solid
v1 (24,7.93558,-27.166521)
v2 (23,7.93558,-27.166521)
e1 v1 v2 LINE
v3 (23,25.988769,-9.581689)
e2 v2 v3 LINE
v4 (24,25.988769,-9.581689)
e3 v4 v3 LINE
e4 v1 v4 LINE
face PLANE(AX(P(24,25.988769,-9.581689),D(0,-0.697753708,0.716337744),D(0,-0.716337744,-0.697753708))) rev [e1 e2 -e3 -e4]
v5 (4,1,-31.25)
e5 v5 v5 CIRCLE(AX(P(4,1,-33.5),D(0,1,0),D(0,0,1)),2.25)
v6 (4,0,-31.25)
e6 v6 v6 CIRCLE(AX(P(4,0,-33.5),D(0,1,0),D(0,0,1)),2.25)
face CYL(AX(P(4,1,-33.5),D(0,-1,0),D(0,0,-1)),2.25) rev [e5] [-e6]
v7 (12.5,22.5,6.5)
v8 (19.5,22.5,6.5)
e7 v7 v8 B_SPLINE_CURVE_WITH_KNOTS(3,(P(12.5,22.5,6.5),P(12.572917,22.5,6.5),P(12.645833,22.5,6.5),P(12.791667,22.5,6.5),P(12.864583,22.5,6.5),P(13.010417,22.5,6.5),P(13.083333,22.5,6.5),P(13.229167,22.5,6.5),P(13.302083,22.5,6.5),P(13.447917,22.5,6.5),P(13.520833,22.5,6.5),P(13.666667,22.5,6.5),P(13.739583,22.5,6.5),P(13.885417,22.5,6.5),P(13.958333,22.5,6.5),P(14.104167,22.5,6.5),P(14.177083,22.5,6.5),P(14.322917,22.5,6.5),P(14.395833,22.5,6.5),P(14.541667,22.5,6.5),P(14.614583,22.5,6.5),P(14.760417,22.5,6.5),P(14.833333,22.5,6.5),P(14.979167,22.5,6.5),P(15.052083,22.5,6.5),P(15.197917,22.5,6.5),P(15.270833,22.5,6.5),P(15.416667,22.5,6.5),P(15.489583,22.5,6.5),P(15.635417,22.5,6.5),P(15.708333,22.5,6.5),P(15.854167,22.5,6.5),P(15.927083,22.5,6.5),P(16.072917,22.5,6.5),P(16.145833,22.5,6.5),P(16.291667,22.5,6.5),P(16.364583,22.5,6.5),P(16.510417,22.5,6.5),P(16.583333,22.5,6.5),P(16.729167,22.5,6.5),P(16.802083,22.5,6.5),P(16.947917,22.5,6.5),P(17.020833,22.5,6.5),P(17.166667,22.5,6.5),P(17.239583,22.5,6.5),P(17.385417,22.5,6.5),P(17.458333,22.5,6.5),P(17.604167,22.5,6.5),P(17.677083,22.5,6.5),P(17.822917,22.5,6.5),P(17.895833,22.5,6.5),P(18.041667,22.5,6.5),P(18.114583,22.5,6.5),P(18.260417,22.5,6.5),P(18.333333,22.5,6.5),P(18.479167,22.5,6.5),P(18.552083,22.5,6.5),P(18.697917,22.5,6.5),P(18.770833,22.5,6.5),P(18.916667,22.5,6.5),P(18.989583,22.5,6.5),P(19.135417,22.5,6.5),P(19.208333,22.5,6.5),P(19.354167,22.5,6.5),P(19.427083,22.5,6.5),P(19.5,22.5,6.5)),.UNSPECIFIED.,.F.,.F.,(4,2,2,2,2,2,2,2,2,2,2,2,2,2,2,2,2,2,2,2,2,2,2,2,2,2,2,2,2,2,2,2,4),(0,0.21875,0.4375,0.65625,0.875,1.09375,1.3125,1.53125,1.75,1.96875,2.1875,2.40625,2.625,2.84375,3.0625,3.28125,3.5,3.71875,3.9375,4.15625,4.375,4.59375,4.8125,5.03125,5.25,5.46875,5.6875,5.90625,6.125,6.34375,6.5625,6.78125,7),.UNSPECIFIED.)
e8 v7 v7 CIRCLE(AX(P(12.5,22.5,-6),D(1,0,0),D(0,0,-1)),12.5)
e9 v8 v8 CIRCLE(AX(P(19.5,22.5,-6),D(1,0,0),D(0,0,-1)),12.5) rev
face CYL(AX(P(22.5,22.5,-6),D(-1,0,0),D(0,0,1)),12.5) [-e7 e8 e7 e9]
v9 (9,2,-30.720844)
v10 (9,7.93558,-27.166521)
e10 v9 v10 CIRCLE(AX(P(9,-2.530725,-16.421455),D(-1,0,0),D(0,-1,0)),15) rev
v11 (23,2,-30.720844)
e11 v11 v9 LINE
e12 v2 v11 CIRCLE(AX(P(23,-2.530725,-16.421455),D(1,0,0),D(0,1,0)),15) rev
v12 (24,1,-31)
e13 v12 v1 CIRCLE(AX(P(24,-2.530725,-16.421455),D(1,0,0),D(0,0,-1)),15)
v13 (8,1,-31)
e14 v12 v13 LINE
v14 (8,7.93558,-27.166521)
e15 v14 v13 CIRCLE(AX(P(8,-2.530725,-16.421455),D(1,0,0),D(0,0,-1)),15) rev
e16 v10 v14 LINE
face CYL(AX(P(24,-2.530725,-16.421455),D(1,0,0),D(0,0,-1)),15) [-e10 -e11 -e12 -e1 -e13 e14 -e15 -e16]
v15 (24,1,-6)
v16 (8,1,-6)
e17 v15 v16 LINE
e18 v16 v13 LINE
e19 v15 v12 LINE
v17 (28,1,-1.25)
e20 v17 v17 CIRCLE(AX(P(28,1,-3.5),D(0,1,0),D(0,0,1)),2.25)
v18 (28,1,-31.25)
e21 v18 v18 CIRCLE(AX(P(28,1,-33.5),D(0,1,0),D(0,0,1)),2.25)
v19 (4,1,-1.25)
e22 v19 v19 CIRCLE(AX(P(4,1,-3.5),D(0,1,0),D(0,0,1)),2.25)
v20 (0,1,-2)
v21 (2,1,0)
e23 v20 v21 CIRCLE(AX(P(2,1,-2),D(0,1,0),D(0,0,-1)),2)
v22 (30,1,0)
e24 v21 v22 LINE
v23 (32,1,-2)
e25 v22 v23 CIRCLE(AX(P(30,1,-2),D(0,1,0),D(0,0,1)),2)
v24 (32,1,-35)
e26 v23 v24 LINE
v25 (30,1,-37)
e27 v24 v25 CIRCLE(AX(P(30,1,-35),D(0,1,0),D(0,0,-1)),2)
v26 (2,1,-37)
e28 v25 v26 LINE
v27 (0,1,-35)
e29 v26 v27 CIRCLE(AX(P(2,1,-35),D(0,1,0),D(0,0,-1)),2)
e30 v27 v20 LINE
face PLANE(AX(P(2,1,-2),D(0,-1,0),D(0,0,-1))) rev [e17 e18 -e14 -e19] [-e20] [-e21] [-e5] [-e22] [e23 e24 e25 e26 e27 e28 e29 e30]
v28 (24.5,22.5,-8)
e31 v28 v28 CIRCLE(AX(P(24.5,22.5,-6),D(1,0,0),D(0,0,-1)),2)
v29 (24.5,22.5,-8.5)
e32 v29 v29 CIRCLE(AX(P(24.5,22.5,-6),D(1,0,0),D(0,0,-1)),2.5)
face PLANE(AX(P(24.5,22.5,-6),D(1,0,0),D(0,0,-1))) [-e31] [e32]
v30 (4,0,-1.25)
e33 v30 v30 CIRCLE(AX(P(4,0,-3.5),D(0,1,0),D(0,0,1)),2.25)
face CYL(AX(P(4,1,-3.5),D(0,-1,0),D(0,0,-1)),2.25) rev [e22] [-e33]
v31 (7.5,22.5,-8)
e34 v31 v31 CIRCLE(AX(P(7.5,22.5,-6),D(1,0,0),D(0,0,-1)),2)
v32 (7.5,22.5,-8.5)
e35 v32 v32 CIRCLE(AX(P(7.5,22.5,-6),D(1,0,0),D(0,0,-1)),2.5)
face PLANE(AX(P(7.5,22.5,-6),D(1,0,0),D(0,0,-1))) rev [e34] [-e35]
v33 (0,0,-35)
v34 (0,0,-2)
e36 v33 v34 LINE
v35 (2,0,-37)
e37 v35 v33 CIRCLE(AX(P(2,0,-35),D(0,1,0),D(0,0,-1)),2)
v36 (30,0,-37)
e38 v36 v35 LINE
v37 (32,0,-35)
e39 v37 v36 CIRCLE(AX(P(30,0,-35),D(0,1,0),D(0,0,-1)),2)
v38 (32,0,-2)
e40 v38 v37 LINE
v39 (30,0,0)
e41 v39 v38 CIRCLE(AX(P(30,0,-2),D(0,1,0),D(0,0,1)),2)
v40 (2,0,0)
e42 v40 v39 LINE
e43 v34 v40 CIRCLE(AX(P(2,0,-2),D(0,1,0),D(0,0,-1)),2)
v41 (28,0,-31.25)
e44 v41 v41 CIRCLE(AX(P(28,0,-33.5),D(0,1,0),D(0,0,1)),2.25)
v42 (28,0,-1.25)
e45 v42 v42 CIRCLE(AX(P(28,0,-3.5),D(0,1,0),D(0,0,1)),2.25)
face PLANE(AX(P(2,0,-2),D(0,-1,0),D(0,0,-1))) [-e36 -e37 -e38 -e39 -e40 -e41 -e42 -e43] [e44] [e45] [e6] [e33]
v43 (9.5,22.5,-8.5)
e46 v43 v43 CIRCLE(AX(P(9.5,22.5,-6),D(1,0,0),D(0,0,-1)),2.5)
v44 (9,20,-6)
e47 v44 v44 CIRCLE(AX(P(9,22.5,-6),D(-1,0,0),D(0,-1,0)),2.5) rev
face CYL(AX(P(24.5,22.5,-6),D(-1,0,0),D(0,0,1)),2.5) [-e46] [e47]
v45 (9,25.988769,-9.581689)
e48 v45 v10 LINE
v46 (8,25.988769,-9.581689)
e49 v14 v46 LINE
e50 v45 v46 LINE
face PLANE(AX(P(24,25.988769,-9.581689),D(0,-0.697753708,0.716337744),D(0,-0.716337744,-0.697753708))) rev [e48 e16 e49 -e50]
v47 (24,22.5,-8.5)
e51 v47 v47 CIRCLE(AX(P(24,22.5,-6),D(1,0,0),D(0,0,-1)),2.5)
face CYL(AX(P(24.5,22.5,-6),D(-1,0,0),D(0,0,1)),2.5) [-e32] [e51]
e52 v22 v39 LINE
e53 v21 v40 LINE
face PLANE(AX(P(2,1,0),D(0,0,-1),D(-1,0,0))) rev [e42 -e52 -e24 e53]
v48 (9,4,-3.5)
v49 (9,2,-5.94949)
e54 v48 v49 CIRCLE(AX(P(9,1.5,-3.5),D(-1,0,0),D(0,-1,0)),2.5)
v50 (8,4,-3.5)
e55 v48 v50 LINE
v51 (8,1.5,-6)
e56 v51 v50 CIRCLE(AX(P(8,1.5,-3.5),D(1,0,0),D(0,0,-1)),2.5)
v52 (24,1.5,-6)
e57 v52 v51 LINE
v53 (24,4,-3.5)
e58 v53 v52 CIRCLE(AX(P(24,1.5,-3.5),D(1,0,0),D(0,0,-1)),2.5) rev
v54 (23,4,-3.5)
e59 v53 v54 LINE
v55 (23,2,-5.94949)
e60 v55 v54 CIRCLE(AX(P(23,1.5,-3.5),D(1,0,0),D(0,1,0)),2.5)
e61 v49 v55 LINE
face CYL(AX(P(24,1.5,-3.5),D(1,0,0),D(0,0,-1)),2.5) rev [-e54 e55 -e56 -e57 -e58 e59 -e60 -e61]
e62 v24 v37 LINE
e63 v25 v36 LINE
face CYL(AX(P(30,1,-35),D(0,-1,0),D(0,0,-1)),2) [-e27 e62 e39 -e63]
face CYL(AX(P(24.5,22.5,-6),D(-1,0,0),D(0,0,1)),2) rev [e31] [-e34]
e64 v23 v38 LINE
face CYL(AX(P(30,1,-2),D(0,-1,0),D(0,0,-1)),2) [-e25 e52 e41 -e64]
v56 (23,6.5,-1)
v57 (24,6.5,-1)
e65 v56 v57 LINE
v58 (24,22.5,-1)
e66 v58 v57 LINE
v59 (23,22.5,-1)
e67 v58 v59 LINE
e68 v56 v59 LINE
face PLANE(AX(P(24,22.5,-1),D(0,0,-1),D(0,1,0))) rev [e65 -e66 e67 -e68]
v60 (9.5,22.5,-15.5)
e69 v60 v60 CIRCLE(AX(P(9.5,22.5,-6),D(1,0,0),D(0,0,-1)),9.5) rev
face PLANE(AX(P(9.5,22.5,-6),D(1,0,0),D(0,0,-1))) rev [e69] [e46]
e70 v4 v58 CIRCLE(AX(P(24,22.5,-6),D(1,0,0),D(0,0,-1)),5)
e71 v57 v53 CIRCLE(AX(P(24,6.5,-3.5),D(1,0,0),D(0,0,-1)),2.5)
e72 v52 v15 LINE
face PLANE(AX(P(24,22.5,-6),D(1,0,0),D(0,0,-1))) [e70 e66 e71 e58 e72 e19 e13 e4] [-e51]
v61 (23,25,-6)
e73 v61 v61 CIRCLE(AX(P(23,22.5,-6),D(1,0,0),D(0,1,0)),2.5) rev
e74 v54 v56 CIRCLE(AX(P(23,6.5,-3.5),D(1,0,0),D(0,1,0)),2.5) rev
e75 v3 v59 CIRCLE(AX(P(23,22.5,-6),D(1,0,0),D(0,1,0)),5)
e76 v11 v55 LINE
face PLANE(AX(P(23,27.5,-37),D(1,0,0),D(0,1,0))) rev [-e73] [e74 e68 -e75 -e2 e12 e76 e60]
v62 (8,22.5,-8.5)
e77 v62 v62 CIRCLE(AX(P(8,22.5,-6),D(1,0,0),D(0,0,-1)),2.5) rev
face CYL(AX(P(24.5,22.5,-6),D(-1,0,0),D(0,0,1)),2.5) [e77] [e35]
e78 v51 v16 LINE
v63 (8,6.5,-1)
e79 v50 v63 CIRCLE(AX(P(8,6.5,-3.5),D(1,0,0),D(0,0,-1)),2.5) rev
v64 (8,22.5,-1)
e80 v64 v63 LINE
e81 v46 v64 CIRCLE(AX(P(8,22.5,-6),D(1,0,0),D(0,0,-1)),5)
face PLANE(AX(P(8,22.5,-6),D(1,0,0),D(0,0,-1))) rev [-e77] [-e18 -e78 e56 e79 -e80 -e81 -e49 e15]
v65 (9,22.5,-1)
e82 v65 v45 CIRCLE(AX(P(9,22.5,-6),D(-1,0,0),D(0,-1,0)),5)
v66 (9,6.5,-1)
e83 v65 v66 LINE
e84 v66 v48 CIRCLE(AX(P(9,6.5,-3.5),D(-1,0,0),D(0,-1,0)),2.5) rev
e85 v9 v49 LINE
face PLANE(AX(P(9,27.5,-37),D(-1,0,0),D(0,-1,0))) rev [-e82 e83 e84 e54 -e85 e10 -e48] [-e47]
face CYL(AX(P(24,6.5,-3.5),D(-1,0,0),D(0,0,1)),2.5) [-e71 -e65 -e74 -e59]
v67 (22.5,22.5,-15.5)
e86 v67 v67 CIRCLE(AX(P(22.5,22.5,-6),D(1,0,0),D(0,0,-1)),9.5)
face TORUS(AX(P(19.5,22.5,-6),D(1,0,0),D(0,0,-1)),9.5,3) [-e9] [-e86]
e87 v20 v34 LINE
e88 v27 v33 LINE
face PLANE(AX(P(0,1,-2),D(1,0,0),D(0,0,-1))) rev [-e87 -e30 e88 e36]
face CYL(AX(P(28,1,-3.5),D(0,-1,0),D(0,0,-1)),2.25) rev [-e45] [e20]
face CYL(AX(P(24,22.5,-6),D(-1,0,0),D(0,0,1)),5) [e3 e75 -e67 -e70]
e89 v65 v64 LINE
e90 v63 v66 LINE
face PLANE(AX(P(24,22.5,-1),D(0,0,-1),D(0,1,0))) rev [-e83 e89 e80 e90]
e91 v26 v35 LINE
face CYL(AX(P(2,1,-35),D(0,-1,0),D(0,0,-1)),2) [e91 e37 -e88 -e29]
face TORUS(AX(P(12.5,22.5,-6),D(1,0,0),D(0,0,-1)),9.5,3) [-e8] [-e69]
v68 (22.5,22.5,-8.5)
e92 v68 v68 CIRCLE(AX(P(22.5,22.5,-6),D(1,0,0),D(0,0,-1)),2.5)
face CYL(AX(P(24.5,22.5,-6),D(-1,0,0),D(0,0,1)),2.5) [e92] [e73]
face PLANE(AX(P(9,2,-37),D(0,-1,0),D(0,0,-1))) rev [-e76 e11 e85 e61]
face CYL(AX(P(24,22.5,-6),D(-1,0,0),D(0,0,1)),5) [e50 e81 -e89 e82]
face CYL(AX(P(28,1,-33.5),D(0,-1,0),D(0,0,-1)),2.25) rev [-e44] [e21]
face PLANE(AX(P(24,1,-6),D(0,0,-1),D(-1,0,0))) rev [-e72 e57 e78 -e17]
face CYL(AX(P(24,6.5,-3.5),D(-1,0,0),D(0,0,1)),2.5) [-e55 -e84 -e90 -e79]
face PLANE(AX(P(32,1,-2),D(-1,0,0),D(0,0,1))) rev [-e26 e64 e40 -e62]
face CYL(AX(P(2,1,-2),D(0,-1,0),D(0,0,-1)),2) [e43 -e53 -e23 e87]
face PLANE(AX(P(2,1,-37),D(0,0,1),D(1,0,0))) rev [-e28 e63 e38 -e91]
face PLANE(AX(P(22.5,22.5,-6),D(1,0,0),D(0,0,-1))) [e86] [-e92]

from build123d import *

# Parameters (mm, degrees)
ESBO_O1_R                = 2.25
RESSALTO_EXTRUS_O1_DEPTH = 1
ESBO_O2_R                = 2.5
RESSALTO_EXTRUS_O2_DEPTH = 8
ESBO_O3_W                = 14
ESBO_O3_H                = 25.5
CORTE_EXTRUS_O1_DEPTH    = 56.463952257
ESBO_O5_R                = 12.5
ESBO_O5_R_2              = 2.5
RESSALTO_EXTRUS_O3_DEPTH = 6.5
FILETE1_R                = 3
ESBO_O6_R                = 2.5
ESBO_O6_R_2              = 2
RESSALTO_EXTRUS_O4_DEPTH = 8.5
FILETE2_R                = 2.5
FILETE3_R                = 15


# Some blends are built 0.0001 mm under size
with BuildPart() as part:
    # Esboço1 → Ressalto-extrusão1 (new body)
    with BuildSketch(Plane(origin=(0, 0, 0), x_dir=(1, 0, 0), z_dir=(0, 1, 0))):
        with BuildLine():
            Line((2, 0), (30, 0))
            ThreePointArc((30, 0), (31.414213562, 0.585786438), (32, 2))
            Line((32, 2), (32, 35))
            ThreePointArc((32, 35), (31.414213562, 36.414213562), (30, 37))
            Line((30, 37), (2, 37))
            ThreePointArc((2, 37), (0.585786438, 36.414213562), (0, 35))
            Line((0, 35), (0, 2))
            ThreePointArc((0, 2), (0.585786438, 0.585786438), (2, 0))
        make_face()
        with Locations(Location((4, 33.5, 0), (0, 0, 270))):
            Circle(ESBO_O1_R, mode=Mode.SUBTRACT)
        with Locations(Location((28, 33.5, 0), (0, 0, 270))):
            Circle(ESBO_O1_R, mode=Mode.SUBTRACT)
        with Locations(Location((4, 3.5, 0), (0, 0, 270))):
            Circle(ESBO_O1_R, mode=Mode.SUBTRACT)
        with Locations(Location((28, 3.5, 0), (0, 0, 270))):
            Circle(ESBO_O1_R, mode=Mode.SUBTRACT)
    extrude(amount=RESSALTO_EXTRUS_O1_DEPTH)

    # Esboço2 → Ressalto-extrusão2 (add, symmetric)
    with BuildSketch(Plane(origin=(16, 0, 0), x_dir=(0, 0, -1), z_dir=(1, 0, 0))):
        with BuildLine():
            Line((1, 22.5), (1, 4))
            Line((1, 4), (6, 4))
            Line((6, 4), (6, 1))
            Line((6, 1), (31, 1))
            Line((31, 1), (31, 4))
            Line((31, 4), (9.581688719, 25.988768539))
            ThreePointArc((9.581688719, 25.988768539), (4.116976314, 27.131870227), (1, 22.5))
        make_face()
        with Locations((6, 22.5)):
            Circle(ESBO_O2_R, mode=Mode.SUBTRACT)
    extrude(amount=RESSALTO_EXTRUS_O2_DEPTH, both=True)

    # Esboço3 → Corte-extrusão1 (cut, through all)
    with BuildSketch(Plane.XY.offset(-1)):
        with Locations((16, 14.75)):
            Rectangle(ESBO_O3_W, ESBO_O3_H)
    extrude(amount=-CORTE_EXTRUS_O1_DEPTH, mode=Mode.SUBTRACT)



with BuildPart() as body_2:
    # Esboço5 → Ressalto-extrusão3 (new, symmetric)
    with BuildSketch(Plane(origin=(16, 0, 0), x_dir=(0, 0, -1), z_dir=(1, 0, 0))):
        with Locations(Location((6, 22.5, 0), (0, 0, 180))):
            Circle(ESBO_O5_R)
        with Locations(Location((6, 22.5, 0), (0, 0, 270))):
            Circle(ESBO_O5_R_2, mode=Mode.SUBTRACT)
    extrude(amount=RESSALTO_EXTRUS_O3_DEPTH, both=True)

    # Filete1
    filete1_edges = [body_2.edges().sort_by_distance(p)[0] for p in [
        (9.5, 22.5, -18.5),
        (22.5, 22.5, -18.5),
    ]]
    fillet(filete1_edges, radius=FILETE1_R)


with BuildPart() as part_1:
    add(part.part)

    add(body_2.part)  # Ressalto-extrusão4 merges body 2
    # Esboço6 → Ressalto-extrusão4 (add, symmetric)
    with BuildSketch(Plane(origin=(16, 0, 0), x_dir=(0, 0, -1), z_dir=(1, 0, 0))):
        with Locations(Location((6, 22.5, 0), (0, 0, 270))):
            Circle(ESBO_O6_R)
        with Locations((6, 22.5)):
            Circle(ESBO_O6_R_2, mode=Mode.SUBTRACT)
    extrude(amount=RESSALTO_EXTRUS_O4_DEPTH, both=True)

    # Filete2
    filete2_edges = [part_1.edges().sort_by_distance(p)[0] for p in [
        (23.5, 4, -6),
        (8.5, 4, -1),
        (23.5, 4, -1),
    ]]
    fillet(filete2_edges, radius=FILETE2_R - 0.0001)  # a hair under: the kernel refuses the full size

    # Filete3
    # the kernel refuses this fillet: 15 mm, written as the material it takes off along each edge
    with BuildSketch(Plane(origin=(37.735072013, 4, -31), x_dir=(0, -1, 0), z_dir=(-1, 0, 0))) as filete3_piece_1:
        with BuildLine():
            CenterArc((6.530725419, 14.578545127), FILETE3_R, 225.752939657, 30.632936919)
            Line((-3.935580199, 3.83347897), (0, 0))
            Line((0, 0), (3, 0))
        make_face()
    extrude(amount=28.470144026, mode=Mode.SUBTRACT)
    with BuildSketch(Plane(origin=(22.735072013, 4, -31), x_dir=(0, 0.7163377438018307, 0.6977537078403117), z_dir=(-1, 0, 0))) as filete3_piece_2:
        with BuildLine():
            CenterArc((5.494028805, -15), FILETE3_R, 90, 30.632936919)
            Line((-2.149013231, -2.093261124), (0, 0))
            Line((0, 0), (5.494028805, 0))
        make_face()
    extrude(amount=28.470144026, mode=Mode.SUBTRACT)


solid = part_1.part
